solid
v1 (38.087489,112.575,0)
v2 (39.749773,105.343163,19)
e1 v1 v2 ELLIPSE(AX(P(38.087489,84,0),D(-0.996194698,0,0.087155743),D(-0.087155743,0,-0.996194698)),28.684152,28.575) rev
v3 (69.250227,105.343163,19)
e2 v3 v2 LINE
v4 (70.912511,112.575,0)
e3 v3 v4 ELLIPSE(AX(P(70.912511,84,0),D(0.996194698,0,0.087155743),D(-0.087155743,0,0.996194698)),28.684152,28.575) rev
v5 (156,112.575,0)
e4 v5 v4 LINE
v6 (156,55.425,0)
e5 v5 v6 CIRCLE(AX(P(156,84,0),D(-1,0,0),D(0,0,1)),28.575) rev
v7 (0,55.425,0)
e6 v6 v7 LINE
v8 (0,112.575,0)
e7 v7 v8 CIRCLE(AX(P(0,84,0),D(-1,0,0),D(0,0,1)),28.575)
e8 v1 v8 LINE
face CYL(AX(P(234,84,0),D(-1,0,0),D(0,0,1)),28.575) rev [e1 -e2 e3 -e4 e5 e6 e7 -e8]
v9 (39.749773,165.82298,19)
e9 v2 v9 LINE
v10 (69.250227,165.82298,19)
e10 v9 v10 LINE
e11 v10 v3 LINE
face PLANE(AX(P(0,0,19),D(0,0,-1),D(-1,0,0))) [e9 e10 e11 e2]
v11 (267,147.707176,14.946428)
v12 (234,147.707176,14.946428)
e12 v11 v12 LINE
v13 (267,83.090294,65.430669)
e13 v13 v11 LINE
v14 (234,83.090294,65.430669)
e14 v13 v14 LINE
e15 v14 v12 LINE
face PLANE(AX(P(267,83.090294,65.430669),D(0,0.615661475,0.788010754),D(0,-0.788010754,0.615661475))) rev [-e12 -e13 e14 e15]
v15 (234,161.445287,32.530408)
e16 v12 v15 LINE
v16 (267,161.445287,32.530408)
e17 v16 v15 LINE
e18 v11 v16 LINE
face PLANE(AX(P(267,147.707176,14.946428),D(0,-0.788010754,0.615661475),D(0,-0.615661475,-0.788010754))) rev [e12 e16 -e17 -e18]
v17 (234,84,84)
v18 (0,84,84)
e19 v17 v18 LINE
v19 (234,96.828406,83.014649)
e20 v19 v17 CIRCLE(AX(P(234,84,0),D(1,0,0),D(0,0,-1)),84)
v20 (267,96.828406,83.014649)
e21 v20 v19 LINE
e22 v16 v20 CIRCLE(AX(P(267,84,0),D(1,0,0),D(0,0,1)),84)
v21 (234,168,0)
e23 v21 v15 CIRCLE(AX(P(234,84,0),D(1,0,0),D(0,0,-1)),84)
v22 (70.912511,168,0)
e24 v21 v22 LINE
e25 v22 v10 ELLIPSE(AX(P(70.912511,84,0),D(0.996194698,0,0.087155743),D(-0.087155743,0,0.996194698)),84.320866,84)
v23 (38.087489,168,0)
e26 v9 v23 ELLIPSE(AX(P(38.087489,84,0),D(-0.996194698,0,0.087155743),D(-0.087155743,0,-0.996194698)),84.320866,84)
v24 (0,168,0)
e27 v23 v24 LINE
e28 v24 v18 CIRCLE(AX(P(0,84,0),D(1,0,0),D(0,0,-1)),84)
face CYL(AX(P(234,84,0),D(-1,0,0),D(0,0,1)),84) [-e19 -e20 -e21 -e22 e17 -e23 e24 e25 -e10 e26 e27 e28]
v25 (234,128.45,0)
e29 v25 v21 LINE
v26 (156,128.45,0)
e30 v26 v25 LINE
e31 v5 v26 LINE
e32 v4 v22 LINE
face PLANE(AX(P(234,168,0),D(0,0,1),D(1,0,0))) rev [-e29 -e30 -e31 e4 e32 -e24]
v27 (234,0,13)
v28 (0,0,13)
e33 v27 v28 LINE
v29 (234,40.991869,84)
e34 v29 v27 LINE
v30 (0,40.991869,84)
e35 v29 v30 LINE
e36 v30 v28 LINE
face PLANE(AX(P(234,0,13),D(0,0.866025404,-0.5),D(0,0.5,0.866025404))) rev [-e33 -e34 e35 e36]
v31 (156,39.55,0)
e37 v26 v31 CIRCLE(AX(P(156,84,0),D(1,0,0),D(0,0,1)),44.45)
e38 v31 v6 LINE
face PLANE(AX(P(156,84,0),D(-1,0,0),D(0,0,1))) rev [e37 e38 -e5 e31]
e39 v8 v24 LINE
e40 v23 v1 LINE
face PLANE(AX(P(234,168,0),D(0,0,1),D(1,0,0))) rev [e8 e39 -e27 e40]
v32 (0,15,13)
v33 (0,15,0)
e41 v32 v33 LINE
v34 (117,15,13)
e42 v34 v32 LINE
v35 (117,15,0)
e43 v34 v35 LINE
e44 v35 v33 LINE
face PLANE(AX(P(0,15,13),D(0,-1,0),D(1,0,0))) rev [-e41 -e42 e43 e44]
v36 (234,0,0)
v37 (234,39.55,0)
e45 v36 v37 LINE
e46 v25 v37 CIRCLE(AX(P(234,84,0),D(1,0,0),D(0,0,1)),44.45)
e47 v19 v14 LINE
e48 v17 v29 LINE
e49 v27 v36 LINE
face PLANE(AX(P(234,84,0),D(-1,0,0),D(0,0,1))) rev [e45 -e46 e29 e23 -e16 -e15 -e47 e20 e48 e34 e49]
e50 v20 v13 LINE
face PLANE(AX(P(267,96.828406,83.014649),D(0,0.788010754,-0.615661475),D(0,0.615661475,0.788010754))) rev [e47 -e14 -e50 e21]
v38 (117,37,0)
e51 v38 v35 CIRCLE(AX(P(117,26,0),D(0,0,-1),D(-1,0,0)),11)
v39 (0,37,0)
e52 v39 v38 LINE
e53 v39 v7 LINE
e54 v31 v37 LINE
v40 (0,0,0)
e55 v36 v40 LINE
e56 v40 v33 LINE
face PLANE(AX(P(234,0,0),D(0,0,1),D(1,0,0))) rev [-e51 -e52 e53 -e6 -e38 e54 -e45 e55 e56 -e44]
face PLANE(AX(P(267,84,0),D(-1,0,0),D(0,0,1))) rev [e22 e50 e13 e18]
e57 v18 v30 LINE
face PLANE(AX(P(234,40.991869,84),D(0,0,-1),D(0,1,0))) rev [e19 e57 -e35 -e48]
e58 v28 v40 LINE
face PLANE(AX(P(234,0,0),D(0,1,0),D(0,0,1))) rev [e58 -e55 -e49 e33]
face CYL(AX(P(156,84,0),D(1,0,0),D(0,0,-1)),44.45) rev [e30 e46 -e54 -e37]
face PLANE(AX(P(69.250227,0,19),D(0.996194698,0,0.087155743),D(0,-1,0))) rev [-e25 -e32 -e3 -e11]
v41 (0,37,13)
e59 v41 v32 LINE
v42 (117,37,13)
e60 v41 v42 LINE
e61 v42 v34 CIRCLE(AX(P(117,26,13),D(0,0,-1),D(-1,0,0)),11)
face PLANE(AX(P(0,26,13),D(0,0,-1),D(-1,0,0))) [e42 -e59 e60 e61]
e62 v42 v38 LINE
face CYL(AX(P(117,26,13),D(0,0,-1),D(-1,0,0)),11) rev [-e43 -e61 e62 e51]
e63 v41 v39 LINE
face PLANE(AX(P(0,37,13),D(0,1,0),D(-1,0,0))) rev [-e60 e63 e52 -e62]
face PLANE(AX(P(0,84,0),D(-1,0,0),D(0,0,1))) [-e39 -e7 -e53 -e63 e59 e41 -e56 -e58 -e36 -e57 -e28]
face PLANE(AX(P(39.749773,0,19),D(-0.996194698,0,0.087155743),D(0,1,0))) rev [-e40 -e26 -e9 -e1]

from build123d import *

# Parameters (mm, degrees)
BOSS_EXTRUDE1_DEPTH = 234
CUT_EXTRUDE1_DEPTH  = 78
BOSS_EXTRUDE2_DEPTH = 33
CUT_EXTRUDE2_DEPTH  = 13
SKETCH6_W           = 33
SKETCH6_H           = 84.469943203
CUT_EXTRUDE3_DEPTH  = 19
CHAMFER2_SIZE       = 1.749773271
CHAMFER2_SIZE_2     = 20


with BuildPart() as part:
    # Sketch1 → Boss-Extrude1 (new body)
    with BuildSketch(Plane(origin=(0, 0, 0), x_dir=(0, 0, -1), z_dir=(1, 0, 0))):
        with BuildLine():
            Line((0, 0), (-13, 0))
            Line((-13, 0), (-84, 40.991869112))
            Line((-84, 40.991869112), (-84, 84))
            ThreePointArc((-84, 84), (-59.39696962, 143.39696962), (0, 168))
            Line((0, 168), (0, 112.575))
            ThreePointArc((0, 112.575), (-28.575, 84), (0, 55.425))
            Line((0, 55.425), (0, 0))
        make_face()
    extrude(amount=BOSS_EXTRUDE1_DEPTH)

    # Sketch2 → Cut-Extrude1 (cut)
    with BuildSketch(Plane(origin=(234, 0, 0), x_dir=(0, 0, -1), z_dir=(1, 0, 0))):
        with BuildLine():
            Line((0, 128.45), (0, 39.55))
            ThreePointArc((0, 39.55), (-44.45, 84), (0, 128.45))
        make_face()
    extrude(amount=-CUT_EXTRUDE1_DEPTH, mode=Mode.SUBTRACT)

    # Sketch3 → Boss-Extrude2 (add)
    with BuildSketch(Plane(origin=(234, 0, 0), x_dir=(0, 0, -1), z_dir=(1, 0, 0))):
        with BuildLine():
            Line((-83.014649379, 96.828405531), (-65.430668922, 83.090294344))
            Line((-65.430668922, 83.090294344), (-14.946427946, 147.707176139))
            Line((-14.946427946, 147.707176139), (-32.530408402, 161.445287327))
            ThreePointArc((-32.530408402, 161.445287327), (-66.192903303, 135.715563927), (-83.014649379, 96.828405531))
        make_face()
    extrude(amount=BOSS_EXTRUDE2_DEPTH)

    # Sketch4 → Cut-Extrude2 (cut)
    with BuildSketch(Plane(origin=(0, 0, 0), x_dir=(-1, 0, 0), z_dir=(0, 0, -1))):
        with BuildLine():
            Line((0, 15), (-117, 15))
            ThreePointArc((-117, 15), (-128, 26), (-117, 37))
            Line((-117, 37), (0, 37))
            ThreePointArc((0, 37), (11, 26), (0, 15))
        make_face()
    extrude(amount=-CUT_EXTRUDE2_DEPTH, mode=Mode.SUBTRACT)

    # Sketch6 → Cut-Extrude3 (cut)
    with BuildSketch(Plane(origin=(0, 0, 0), x_dir=(-1, 0, 0), z_dir=(0, 0, -1))):
        with Locations((-54.5, 125.765028398)):
            Rectangle(SKETCH6_W, SKETCH6_H)
    extrude(amount=-CUT_EXTRUDE3_DEPTH, mode=Mode.SUBTRACT)

    # Chamfer2
    # the kernel refuses this chamfer: 20, 1.749773271 mm, written as the material it adds along each edge
    with BuildSketch(Plane(origin=(38, 53.350481829, 19), x_dir=(0.9159861691531124, 0, 0.4012098427509048), z_dir=(0, 1, 0))) as chamfer2_piece_1_section:
        Polygon((CHAMFER2_SIZE * 0.915986168901, CHAMFER2_SIZE * 0.40120984264), (-CHAMFER2_SIZE_2 * 0.401209842751, CHAMFER2_SIZE_2 * 0.915986169153), (0, 0), align=None)
    chamfer2_piece_1 = extrude(amount=164.465179425, mode=Mode.PRIVATE)
    chamfer2_piece_1 = chamfer2_piece_1 - Plane(origin=(38.476894186, 84, 0), x_dir=(0, 1, 0), z_dir=(-1, 0, 0)) * Cylinder(28.575, 403, mode=Mode.PRIVATE)
    chamfer2_piece_1 = split(chamfer2_piece_1, bisect_by=Plane(origin=(38.476894186, 56.471998141, 0), z_dir=(0, 0, 1)), keep=Keep.TOP, mode=Mode.PRIVATE)
    chamfer2_piece_1 = chamfer2_piece_1 & Plane(origin=(38.476894186, 84, 0), x_dir=(0, 0, 1), z_dir=(-1, 0, 0)) * Cylinder(84, 403, mode=Mode.PRIVATE)
    add(chamfer2_piece_1)
    with BuildSketch(Plane(origin=(71, 217.815661254, 19), x_dir=(0.003352615794032912, 0, -0.9999943799678763), z_dir=(0, -1, 0))) as chamfer2_piece_2_section:
        Polygon((CHAMFER2_SIZE_2 * 0.999994379968, -CHAMFER2_SIZE_2 * 0.00335261579403), (-CHAMFER2_SIZE * 0.00335261579311, -CHAMFER2_SIZE * 0.999994379693), (0, 0), align=None)
    chamfer2_piece_2 = extrude(amount=164.465179425, mode=Mode.PRIVATE)
    chamfer2_piece_2 = chamfer2_piece_2 - Plane(origin=(70.625797468, 84, 0), x_dir=(0, 1, 0), z_dir=(-1, 0, 0)) * Cylinder(28.575, 409, mode=Mode.PRIVATE)
    chamfer2_piece_2 = chamfer2_piece_2 & Plane(origin=(70.625797468, 84, 0), x_dir=(0, 0, 1), z_dir=(-1, 0, 0)) * Cylinder(84, 409, mode=Mode.PRIVATE)
    chamfer2_piece_2 = split(chamfer2_piece_2, bisect_by=Plane(origin=(70.625797468, 138.170488536, 0), z_dir=(0, 0, 1)), keep=Keep.TOP, mode=Mode.PRIVATE)
    add(chamfer2_piece_2)


solid = part.part
